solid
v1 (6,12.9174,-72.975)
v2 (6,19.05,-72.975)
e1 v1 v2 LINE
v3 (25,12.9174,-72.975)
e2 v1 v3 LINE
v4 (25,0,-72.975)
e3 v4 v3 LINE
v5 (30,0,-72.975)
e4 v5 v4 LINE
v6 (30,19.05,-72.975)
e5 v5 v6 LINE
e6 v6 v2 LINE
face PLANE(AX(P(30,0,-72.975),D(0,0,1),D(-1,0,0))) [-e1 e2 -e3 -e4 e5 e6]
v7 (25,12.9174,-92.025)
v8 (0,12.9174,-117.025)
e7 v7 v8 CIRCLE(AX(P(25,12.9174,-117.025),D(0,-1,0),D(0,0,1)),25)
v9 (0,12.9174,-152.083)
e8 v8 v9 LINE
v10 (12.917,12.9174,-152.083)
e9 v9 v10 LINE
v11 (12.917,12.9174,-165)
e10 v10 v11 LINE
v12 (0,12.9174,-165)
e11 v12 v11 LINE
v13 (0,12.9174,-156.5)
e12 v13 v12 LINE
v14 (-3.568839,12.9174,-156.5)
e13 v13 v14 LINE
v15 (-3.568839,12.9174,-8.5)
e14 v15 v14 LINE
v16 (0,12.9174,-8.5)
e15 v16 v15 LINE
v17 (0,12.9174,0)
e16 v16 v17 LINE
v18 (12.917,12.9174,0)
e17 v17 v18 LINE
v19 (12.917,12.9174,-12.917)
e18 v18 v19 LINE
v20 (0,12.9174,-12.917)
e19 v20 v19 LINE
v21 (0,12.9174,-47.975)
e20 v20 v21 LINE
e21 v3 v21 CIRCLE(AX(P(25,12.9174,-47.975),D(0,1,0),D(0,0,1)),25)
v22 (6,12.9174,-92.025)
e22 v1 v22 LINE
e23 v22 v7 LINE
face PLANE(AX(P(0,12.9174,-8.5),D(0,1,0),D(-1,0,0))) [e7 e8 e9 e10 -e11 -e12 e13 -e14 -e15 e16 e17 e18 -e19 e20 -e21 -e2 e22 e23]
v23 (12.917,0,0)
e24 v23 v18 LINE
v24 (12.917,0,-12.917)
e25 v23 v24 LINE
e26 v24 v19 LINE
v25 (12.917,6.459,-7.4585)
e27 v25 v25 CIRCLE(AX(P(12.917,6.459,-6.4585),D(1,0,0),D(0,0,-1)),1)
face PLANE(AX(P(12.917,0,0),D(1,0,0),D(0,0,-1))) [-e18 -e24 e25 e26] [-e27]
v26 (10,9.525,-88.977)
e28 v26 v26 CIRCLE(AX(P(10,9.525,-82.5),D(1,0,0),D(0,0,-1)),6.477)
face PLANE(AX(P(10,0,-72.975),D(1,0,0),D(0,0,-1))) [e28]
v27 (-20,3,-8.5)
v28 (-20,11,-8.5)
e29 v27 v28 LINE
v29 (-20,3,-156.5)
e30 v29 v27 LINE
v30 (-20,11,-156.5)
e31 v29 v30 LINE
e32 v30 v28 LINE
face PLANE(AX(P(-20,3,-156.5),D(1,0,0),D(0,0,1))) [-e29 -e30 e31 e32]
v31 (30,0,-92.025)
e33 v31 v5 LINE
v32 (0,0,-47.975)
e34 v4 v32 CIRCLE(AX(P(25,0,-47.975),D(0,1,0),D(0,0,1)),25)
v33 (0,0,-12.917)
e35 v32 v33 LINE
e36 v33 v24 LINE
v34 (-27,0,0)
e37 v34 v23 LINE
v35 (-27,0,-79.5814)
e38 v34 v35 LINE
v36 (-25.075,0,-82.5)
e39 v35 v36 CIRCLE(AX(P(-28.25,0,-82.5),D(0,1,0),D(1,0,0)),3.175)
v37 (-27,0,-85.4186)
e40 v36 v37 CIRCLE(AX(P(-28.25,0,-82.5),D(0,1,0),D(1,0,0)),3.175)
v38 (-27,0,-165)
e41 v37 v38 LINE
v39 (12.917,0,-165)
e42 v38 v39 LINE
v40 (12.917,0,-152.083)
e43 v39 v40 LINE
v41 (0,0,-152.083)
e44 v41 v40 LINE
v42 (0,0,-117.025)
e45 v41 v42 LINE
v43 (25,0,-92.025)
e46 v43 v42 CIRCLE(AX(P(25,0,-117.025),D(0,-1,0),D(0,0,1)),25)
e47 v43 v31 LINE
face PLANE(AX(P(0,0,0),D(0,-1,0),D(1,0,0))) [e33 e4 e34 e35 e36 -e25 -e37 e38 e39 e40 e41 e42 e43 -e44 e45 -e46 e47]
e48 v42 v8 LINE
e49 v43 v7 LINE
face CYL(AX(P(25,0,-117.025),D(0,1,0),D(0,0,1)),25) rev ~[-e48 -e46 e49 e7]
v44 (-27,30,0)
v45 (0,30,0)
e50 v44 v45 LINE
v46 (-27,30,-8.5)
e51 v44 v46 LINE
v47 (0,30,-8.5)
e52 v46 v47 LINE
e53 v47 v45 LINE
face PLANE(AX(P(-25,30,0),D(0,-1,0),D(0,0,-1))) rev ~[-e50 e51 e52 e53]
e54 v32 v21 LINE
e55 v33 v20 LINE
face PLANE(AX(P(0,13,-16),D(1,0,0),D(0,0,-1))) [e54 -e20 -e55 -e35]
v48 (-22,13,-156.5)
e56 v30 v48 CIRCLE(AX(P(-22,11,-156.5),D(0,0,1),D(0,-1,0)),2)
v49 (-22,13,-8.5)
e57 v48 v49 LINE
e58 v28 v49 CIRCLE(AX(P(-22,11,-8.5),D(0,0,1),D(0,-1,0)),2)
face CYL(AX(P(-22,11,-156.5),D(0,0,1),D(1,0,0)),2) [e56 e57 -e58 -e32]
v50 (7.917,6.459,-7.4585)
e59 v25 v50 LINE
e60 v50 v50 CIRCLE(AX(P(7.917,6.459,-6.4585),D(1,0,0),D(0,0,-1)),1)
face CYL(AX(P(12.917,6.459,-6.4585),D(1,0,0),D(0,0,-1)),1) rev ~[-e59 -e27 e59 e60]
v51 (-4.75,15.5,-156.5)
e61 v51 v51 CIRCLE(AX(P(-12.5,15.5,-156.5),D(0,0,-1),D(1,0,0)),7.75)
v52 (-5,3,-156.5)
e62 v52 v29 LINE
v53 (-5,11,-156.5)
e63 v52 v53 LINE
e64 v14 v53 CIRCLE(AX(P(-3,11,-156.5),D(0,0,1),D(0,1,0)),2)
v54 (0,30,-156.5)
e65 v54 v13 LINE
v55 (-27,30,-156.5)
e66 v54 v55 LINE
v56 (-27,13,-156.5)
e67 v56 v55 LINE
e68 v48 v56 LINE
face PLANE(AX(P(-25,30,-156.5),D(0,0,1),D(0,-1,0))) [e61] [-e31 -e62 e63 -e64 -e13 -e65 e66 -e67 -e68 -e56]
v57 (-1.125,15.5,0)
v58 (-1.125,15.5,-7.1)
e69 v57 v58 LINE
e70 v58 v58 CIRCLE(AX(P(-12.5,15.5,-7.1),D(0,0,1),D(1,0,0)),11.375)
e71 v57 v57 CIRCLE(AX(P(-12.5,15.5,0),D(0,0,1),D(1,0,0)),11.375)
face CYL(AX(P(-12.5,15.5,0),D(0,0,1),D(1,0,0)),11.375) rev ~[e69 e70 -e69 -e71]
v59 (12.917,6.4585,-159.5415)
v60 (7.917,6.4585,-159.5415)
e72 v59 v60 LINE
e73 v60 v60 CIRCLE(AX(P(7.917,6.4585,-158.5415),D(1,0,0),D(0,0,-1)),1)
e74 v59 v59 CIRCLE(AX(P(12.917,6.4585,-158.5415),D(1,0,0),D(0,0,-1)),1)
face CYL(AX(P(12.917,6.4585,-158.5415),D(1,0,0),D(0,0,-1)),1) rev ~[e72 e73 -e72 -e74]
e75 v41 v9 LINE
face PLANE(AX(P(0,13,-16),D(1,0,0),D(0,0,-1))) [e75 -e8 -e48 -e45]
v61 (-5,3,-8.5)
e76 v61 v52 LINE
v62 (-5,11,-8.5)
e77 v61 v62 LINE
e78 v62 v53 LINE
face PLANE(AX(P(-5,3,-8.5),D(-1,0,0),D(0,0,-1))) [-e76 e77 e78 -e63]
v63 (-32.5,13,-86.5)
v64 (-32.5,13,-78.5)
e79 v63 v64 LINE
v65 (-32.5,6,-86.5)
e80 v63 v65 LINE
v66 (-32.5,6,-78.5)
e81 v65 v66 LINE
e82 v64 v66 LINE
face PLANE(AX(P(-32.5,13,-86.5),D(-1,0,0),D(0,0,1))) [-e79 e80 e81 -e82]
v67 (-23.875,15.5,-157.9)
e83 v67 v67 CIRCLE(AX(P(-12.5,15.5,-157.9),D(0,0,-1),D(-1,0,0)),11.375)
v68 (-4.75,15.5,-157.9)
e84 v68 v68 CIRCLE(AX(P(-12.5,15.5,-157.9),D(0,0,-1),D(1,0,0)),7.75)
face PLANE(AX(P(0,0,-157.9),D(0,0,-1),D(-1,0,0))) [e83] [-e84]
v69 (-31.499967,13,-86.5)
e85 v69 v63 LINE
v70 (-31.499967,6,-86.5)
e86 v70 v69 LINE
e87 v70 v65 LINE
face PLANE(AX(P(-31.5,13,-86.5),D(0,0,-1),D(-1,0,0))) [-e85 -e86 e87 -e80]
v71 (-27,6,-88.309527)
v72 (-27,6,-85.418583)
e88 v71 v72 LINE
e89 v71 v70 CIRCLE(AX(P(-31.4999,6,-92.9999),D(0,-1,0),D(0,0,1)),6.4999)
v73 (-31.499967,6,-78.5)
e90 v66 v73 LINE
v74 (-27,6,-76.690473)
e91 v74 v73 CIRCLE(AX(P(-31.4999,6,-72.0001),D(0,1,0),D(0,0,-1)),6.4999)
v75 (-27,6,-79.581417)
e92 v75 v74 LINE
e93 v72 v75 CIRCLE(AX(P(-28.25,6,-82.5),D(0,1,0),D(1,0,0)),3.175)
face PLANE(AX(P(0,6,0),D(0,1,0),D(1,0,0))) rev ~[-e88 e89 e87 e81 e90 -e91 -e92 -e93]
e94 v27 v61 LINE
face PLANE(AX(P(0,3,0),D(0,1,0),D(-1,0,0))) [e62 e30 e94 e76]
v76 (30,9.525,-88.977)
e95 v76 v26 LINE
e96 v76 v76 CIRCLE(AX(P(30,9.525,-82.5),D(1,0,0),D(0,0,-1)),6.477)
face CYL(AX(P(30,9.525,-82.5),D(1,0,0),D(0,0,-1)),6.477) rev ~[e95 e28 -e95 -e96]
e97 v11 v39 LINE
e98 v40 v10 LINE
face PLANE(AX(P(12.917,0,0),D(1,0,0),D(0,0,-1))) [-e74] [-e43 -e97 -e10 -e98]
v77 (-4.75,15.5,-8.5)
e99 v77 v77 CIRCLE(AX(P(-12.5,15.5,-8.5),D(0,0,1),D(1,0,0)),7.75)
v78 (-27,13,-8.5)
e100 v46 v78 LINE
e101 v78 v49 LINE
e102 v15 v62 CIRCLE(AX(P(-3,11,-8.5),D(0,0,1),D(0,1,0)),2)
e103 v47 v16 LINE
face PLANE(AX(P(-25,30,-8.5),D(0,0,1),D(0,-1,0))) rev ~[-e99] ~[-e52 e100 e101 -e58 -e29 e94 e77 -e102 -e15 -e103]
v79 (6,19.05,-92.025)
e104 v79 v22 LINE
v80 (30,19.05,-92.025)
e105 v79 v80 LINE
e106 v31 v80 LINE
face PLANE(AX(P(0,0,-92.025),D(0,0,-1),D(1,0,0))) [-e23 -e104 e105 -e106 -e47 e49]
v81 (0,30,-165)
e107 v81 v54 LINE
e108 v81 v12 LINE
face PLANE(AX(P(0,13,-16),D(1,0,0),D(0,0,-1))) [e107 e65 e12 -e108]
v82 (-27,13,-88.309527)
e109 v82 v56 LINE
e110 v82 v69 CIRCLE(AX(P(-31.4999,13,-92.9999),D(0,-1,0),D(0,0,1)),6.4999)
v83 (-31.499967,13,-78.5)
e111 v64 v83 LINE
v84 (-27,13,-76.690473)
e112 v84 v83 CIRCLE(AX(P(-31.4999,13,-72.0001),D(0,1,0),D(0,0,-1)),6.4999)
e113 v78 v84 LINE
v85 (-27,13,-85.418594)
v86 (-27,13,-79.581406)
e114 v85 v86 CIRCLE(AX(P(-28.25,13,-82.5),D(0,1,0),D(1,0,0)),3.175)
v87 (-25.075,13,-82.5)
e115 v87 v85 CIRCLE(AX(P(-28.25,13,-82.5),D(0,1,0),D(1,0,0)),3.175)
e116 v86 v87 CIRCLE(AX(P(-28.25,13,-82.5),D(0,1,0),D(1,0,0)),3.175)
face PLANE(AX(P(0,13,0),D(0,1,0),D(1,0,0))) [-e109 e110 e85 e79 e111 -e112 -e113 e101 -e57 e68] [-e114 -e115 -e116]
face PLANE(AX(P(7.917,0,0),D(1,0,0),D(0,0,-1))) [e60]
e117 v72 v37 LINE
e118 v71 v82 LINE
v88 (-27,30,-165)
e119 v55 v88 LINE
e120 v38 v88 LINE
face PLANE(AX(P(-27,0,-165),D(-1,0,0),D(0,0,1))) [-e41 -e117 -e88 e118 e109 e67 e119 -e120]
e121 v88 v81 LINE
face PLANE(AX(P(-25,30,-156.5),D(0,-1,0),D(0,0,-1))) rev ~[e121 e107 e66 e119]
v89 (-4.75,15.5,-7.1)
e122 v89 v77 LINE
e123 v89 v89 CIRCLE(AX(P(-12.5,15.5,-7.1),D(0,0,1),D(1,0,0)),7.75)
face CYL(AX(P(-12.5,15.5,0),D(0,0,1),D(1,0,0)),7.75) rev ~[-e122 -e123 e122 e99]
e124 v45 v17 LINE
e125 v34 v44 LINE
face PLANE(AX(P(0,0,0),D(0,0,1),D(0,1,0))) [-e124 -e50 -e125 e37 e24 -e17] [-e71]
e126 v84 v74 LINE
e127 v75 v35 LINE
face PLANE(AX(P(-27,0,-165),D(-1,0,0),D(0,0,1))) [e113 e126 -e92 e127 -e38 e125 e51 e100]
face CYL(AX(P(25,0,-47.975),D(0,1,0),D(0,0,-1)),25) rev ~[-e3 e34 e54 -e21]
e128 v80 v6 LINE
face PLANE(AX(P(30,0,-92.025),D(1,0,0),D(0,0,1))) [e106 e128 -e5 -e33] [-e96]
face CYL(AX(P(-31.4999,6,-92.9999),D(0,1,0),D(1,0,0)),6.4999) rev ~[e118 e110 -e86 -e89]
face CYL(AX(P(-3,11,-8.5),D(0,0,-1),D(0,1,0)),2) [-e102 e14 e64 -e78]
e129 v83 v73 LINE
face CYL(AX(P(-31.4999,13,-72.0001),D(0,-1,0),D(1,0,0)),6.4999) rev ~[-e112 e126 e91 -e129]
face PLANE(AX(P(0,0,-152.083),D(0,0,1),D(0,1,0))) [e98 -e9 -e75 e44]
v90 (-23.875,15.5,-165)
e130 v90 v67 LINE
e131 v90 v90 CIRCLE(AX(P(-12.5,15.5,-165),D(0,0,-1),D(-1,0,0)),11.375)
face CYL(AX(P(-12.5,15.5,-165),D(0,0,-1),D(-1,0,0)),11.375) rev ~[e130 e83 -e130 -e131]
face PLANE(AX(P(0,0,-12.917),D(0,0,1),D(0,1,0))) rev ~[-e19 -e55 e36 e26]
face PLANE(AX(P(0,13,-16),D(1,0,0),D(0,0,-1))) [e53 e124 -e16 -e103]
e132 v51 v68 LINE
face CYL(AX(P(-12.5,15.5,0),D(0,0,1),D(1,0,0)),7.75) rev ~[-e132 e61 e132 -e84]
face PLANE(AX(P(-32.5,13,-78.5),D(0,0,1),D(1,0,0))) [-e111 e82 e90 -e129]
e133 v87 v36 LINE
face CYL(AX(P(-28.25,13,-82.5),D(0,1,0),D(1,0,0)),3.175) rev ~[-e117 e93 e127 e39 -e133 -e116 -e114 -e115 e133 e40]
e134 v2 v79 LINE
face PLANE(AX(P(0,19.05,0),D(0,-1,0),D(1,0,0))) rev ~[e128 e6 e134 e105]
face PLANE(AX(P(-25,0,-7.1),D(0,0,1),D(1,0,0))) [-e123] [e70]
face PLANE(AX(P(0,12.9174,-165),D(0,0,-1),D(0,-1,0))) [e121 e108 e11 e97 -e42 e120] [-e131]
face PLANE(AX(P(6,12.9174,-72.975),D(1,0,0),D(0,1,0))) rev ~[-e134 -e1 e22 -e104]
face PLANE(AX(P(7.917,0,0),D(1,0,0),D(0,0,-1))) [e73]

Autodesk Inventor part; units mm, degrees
ref_plane "YZ Plane" through (0, 0, 0) normal (1, 0, 0) x (0, 1, 0)
ref_plane "XZ Plane" through (0, 0, 0) normal (0, 1, 0) x (-1, 0, 0)
ref_plane "XY Plane" through (0, 0, 0) normal (0, 0, 1) x (1, 0, 0)
sketch "Sketch1" plane through (0, 0, 0) normal (0, 1, 0) x (-1, 0, 0)
  line L0 (0, 0) -> (25, 0)
  line L1 (25, 0) -> (25, -165)
  line L2 (25, -165) -> (0, -165)
  line L3 (0, -165) -> (0, 0)
  dimension "d0" = 25
  dimension "d1" = 165
extrude "Extrusion1" add sketch "Sketch1" along normal blind 3
sketch "Sketch2" plane through (0, 3, 0) normal (0, 1, 0) x (1, 0, 0)
  line L0 (0, 0) -> (0, 165) projected
  line L1 (-25, 165) -> (-25, 0) projected
  line L2 (0, 0) -> (-25, 0)
  line L3 (-25, 0) -> (-25, 8.5)
  line L4 (-25, 8.5) -> (0, 8.5)
  line L5 (0, 8.5) -> (0, 0)
  line L6 (-25, 165) -> (0, 165)
  line L7 (0, 165) -> (0, 156.5)
  line L8 (0, 156.5) -> (-25, 156.5)
  line L9 (-25, 156.5) -> (-25, 165)
  dimension "d4" = 8.5
  dimension "d5" = 8.5
extrude "Extrusion2" add sketch "Sketch2" along normal blind 25 contours L2 L1 L4 L0 | L8 L1 L6 L0
sketch "Sketch3" plane through (-25, 0, 0) normal (0, 0, 1) x (1, 0, 0)
  line L0 (0, 3) -> (0, 28) construction
  line L1 (25, 3) -> (25, 28) construction
  line L2 (0, 28) -> (25, 28) construction
  line L3 (25, 28) -> (25, 3) construction
  line L4 (25, 3) -> (0, 3) construction
  line L5 (0, 3) -> (0, 28) construction
  circle A0 centre (12.5, 15.5) radius 11.375
  point P0 (25, 0)
  dimension "d8" = 25
  dimension "d9" = 22.75
extrude "Extrusion3" cut sketch "Sketch3" against normal blind 7.1
sketch "Sketch4" plane through (-25, 0, 0) normal (0, 0, 1) x (1, 0, 0)
  circle A0 centre (12.5, 15.5) radius 11.375 projected
  circle A1 centre (12.5, 15.5) radius 7.75
  point P0 (25, 0)
  dimension "d12" = 15.5
extrude "Extrusion4" cut sketch "Sketch4" against normal blind 165 contours A1
sketch "Sketch5" plane through (0, 0, -165) normal (0, 0, -1) x (-1, 0, 0)
  circle A0 centre (12.5, 15.5) radius 7.75 projected
  circle A1 centre (12.5, 15.5) radius 11
  point P0 (0, 0)
extrude "Extrusion5" cut sketch "Sketch5" against normal blind 7.1
sketch "Sketch6" plane through (0, 3, 0) normal (0, 1, 0) x (1, 0, 0)
  line L0 (-25, 156.5) -> (-25, 8.5) projected
  line L1 (-20.25, 8.5) -> (-4.75, 8.5) projected
  line L2 (-25, 156.5) -> (-20, 156.5)
  line L3 (-20, 156.5) -> (-20, 8.5)
  line L4 (-20, 8.5) -> (-25, 8.5)
  line L5 (-25, 8.5) -> (-25, 156.5)
  line L6 (0, 8.5) -> (0, 156.5) projected
  line L7 (-4.75, 156.5) -> (-20.25, 156.5) projected
  line L8 (0, 8.5) -> (-5, 8.5)
  line L9 (-5, 8.5) -> (-5, 156.5)
  line L10 (-5, 156.5) -> (0, 156.5)
  line L11 (0, 156.5) -> (0, 8.5)
  point P0 (0, 0)
  dimension "d17" = 5
  dimension "d18" = 5
extrude "Extrusion6" add sketch "Sketch6" along normal blind 10 contours L2 L3 L1 L4 L0 | L7 L10 L6 L8 L1 L9
fillet "Fillet1" radius 2 2 edges at (-5, 13, -82.5) (-20, 13, -82.5)
sketch "Sketch7" plane through (0, 0, 0) normal (1, 0, 0) x (0, 0, -1)
  line L0 (165, 0) -> (0, 0) projected
  line L1 (0, 0) -> (16, 0)
  line L2 (16, 0) -> (16, 8)
  line L3 (16, 8) -> (0, 8)
  line L4 (0, 8) -> (0, 0)
  line L5 (165, 0) -> (149, 0)
  line L6 (149, 0) -> (149, 8)
  line L7 (149, 8) -> (165, 8)
  line L8 (165, 8) -> (165, 0)
  line L9 (0, 28) -> (8.5, 28) projected
  line L10 (0, 28) -> (16, 28)
  line L11 (16, 28) -> (16, 20)
  line L12 (16, 20) -> (0, 20)
  line L13 (0, 20) -> (0, 28)
  line L14 (165, 0) -> (165, 28) projected
  line L15 (165, 28) -> (149, 28)
  line L16 (149, 28) -> (149, 20)
  line L17 (149, 20) -> (165, 20)
  line L18 (165, 20) -> (165, 28)
  dimension "d22" = 16
  dimension "d23" = 8
  dimension "d24" = 16
  dimension "d25" = 16
  dimension "d26" = 8
extrude "Extrusion7" add sketch "Sketch7" along normal blind 45
fillet "Fillet2" radius 6 2 edges at (0, 24, -156.5) (0, 24, -8.5)
sketch "Sketch8" plane through (45, 0, 0) normal (1, 0, 0) x (0, 0, -1)
  line L0 (8.5, 20) -> (0, 20) construction
  line L1 (16, 28) -> (16, 20) construction
  line L2 (0, 20) -> (16, 28) construction
  line L3 (0, 0) -> (165, 0) construction
  line L4 (16, 8) -> (16, 0) construction
  line L5 (0, 0) -> (16, 8) construction
  line L6 (150.5, 28) -> (149, 28) construction
  line L7 (165, 8) -> (165, 20) construction
  line L8 (149, 28) -> (165, 20) construction
  line L9 (149, 0) -> (149, 8) construction
  line L10 (149, 8) -> (165, 0) construction
  line L11 (163.125, 22.25) -> (150.875, 22.25)
  line L12 (150.875, 22.25) -> (150.875, 25.75)
  line L13 (150.875, 25.75) -> (163.125, 25.75)
  line L14 (163.125, 25.75) -> (163.125, 22.25)
  line L15 (163.125, 22.25) -> (150.875, 25.75) construction
  line L16 (150.875, 22.25) -> (163.125, 25.75) construction
  line L17 (163.125, 2.25) -> (150.875, 2.25)
  line L18 (150.875, 2.25) -> (150.875, 5.75)
  line L19 (150.875, 5.75) -> (163.125, 5.75)
  line L20 (163.125, 5.75) -> (163.125, 2.25)
  line L21 (163.125, 2.25) -> (150.875, 5.75) construction
  line L22 (150.875, 2.25) -> (163.125, 5.75) construction
  line L23 (14.125, 22.25) -> (1.875, 22.25)
  line L24 (1.875, 22.25) -> (1.875, 25.75)
  line L25 (1.875, 25.75) -> (14.125, 25.75)
  line L26 (14.125, 25.75) -> (14.125, 22.25)
  line L27 (14.125, 22.25) -> (1.875, 25.75) construction
  line L28 (1.875, 22.25) -> (14.125, 25.75) construction
  line L29 (14.125, 2.25) -> (1.875, 2.25)
  line L30 (1.875, 2.25) -> (1.875, 5.75)
  line L31 (1.875, 5.75) -> (14.125, 5.75)
  line L32 (14.125, 5.75) -> (14.125, 2.25)
  line L33 (14.125, 2.25) -> (1.875, 5.75) construction
  line L34 (1.875, 2.25) -> (14.125, 5.75) construction
  point P0 (157, 24)
  point P1 (157, 4)
  point P2 (8, 24)
  point P3 (8, 4)
  dimension "d30" = 12.25
  dimension "d31" = 3.5
  dimension "d32" = 12.25
  dimension "d33" = 3.5
  dimension "d34" = 12.25
  dimension "d35" = 12.25
  dimension "d36" = 3.5
extrude "Extrusion8" cut sketch "Sketch8" against normal blind 40
sketch "Sketch9" plane through (0, 8, 0) normal (0, 1, 0) x (1, 0, 0)
  line L0 (0, 0) -> (0, 16) construction
  line L1 (0, 8) -> (0, 9) construction
  line L2 (45, 1.875) -> (45, 14.125) construction
  line L3 (0, 9) -> (45, 9) construction
  line L4 (45, 9) -> (45, 7) construction
  line L5 (45, 7) -> (0, 7) construction
  line L6 (0, 7) -> (0, 9) construction
  line L7 (0, 9) -> (45, 9)
  line L8 (45, 9) -> (45, 7)
  line L9 (45, 7) -> (0, 7)
  line L10 (0, 7) -> (0, 9)
  line L11 (0, 149) -> (0, 165) construction
  line L12 (0, 149) -> (0, 157) construction
  line L13 (0, 157) -> (0, 158) construction
  line L14 (45, 165) -> (45, 149) projected
  line L15 (0, 158) -> (45, 158)
  line L16 (45, 158) -> (45, 156)
  line L17 (45, 156) -> (0, 156)
  line L18 (0, 156) -> (0, 158)
  dimension "d39" = 1
  dimension "d40" = 2
  dimension "d41" = 8
  dimension "d42" = 1
  dimension "d43" = 2
extrude "Extrusion9" add sketch "Sketch9" along normal blind 12
fillet "Fillet3" radius 6 2 edges at (0, 16.5, -156.5) (0, 16.5, -8.5)
sketch "Sketch10" plane through (-25, 0, -165) normal (-1, 0, 0) x (0, 0, 1)
  line L0 (165, 0) -> (0, 0) construction
  line L1 (82.5, 0) -> (82.5, 6) construction
  line L2 (156.5, 13) -> (8.5, 13) construction
  line L3 (82.5, 6) -> (86.5, 6) construction
  line L4 (86.5, 6) -> (86.5, 13) construction
  line L5 (86.5, 13) -> (82.5, 13) construction
  line L6 (82.5, 13) -> (82.5, 6) construction
  line L7 (86.5, 6) -> (78.5, 6)
  line L8 (78.5, 6) -> (78.5, 13)
  line L9 (78.5, 13) -> (86.5, 13)
  line L10 (86.5, 13) -> (86.5, 6)
  dimension "d47" = 6
  dimension "d48" = 4
  dimension "d49" = 8
extrude "Extrusion10" add sketch "Sketch10" along normal blind 6.5
sketch "Sketch11" plane through (0, 13, 0) normal (0, 1, 0) x (1, 0, 0)
  line L0 (-25, 156.5) -> (-25, 86.5) construction
  line L1 (-31.5, 78.5) -> (-31.5, 86.5) construction
  line L2 (-25, 86.5) -> (-31.5, 78.5) construction
  circle A0 centre (-28.25, 82.5) radius 3.175
  point P0 (0, 0)
  dimension "d52" = 6.35
extrude "Extrusion11" cut sketch "Sketch11" against normal blind 8
fillet "Fillet4" radius 6.5 2 edges at (-25, 9.5, -86.5) (-25, 9.5, -78.5)
sketch "Sketch12" plane through (-25, 0, 0) normal (0, 0, 1) x (1, 0, 0)
  circle A0 centre (12.5, 15.5) radius 7.75 construction
  circle A1 centre (12.5, 15.5) radius 23.5 construction
  line L0 (25, 20) -> (70, 20) projected
  arc A2 (70, 20) -> (25, 0) centre (68.4414, -37.118) ccw
  line L1 (70, 8) -> (70, 0) projected
  line L2 (25, 0) -> (70, 0)
  line L3 (70, 0) -> (70, 20)
  dimension "d56" = 47
sketch "Sketch13" plane through (0, 13, 0) normal (0, 1, 0) x (1, 0, 0)
  line L0 (-31.5, 86.5) -> (-31.5, 78.5) projected
  line L1 (-31.5, 86.5) -> (-32.5, 86.5)
  line L2 (-32.5, 86.5) -> (-32.5, 78.5)
  line L3 (-32.5, 78.5) -> (-31.5, 78.5)
  line L4 (-31.5, 78.5) -> (-31.5, 86.5)
  point P0 (0, 0)
  dimension "d57" = 1
extrude "Extrusion12" add sketch "Sketch13" against normal blind 7
sketch "Sketch14" plane through (-25, 0, -165) normal (0, 0, -1) x (-1, 0, 0)
  circle A0 centre (-12.5, 15.5) radius 11.375 projected
  circle A1 centre (-12.5, 15.5) radius 11.375
  point P0 (-25, 0)
extrude "Extrusion13" cut sketch "Sketch14" against normal blind 7.1
sketch "Sketch15" plane through (0, 8, 0) normal (0, 1, 0) x (1, 0, 0)
  line L0 (0, 16) -> (45, 16) projected
  line L1 (0, 0) -> (45, 0)
  line L2 (45, 0) -> (45, 16)
  line L3 (45, 16) -> (0, 16)
  line L4 (0, 16) -> (0, 0)
  line L5 (0, 149) -> (45, 149) projected
  line L6 (0, 149) -> (45, 149)
  line L7 (45, 149) -> (45, 165)
  line L8 (45, 165) -> (0, 165)
  line L9 (0, 165) -> (0, 149)
extrude "Extrusion14" add sketch "Sketch15" along normal blind 14.5
sketch "Sketch16" plane through (-25, 0, 0) normal (0, 0, 1) x (1, 0, 0)
  point P0 (25, 0)
sketch "Sketch17" plane through (0, 28, 0) normal (0, 1, 0) x (1, 0, 0)
  line L0 (-25, 0) -> (0, 0)
  line L1 (0, 0) -> (0, 8.5)
  line L2 (0, 8.5) -> (-25, 8.5)
  line L3 (-25, 8.5) -> (-25, 0)
  line L4 (0, 16) -> (45, 16) projected
  line L5 (0, 0) -> (45, 0)
  line L6 (45, 0) -> (45, 16)
  line L7 (45, 16) -> (0, 16)
  line L8 (0, 16) -> (0, 0)
  line L9 (0, 150.5) -> (0, 149) projected
  line L10 (-25, 165) -> (45, 165) projected
  line L11 (0, 149) -> (45, 149)
  line L12 (45, 149) -> (45, 165)
  line L13 (45, 165) -> (0, 165)
  line L14 (0, 165) -> (0, 149)
  line L15 (-25, 156.5) -> (-25, 93) projected
  line L16 (-25, 156.5) -> (0, 156.5)
  line L17 (0, 156.5) -> (0, 165)
  line L18 (0, 165) -> (-25, 165)
  line L19 (-25, 165) -> (-25, 156.5)
  arc A0 (0, 150.5) -> (-6, 156.5) centre (-6, 150.5) ccw projected
  arc A1 (0, 150.5) -> (-6, 156.5) centre (-6, 150.5) ccw
  arc A2 (-6, 8.5) -> (0, 14.5) centre (-6, 14.5) ccw projected
  arc A3 (-6, 8.5) -> (0, 14.5) centre (-6, 14.5) ccw
extrude "Extrusion15" add sketch "Sketch17" along normal blind 2
sketch "Sketch18" plane through (-25, 0, -165) normal (-1, 0, 0) x (0, 0, 1)
  line L0 (165, 0) -> (165, 30) projected
  line L1 (165, 0) -> (0, 0) projected
  line L2 (165, 30) -> (156.5, 30)
  line L3 (156.5, 30) -> (156.5, 0)
  line L4 (156.5, 0) -> (165, 0)
  line L5 (165, 0) -> (165, 30)
  line L6 (8.5, 30) -> (8.5, 20) projected
  line L7 (0, 0) -> (0, 30) projected
  line L8 (8.5, 30) -> (0, 30)
  line L9 (0, 30) -> (0, 0)
  line L10 (0, 0) -> (8.5, 0)
  line L11 (8.5, 0) -> (8.5, 30)
  line L12 (93, 13) -> (156.5, 13) projected
  line L13 (8.5, 0) -> (156.5, 0)
  line L14 (156.5, 0) -> (156.5, 13)
  line L15 (156.5, 13) -> (8.5, 13)
  line L16 (8.5, 13) -> (8.5, 0)
  dimension "d66" = 8.5
extrude "Extrusion16" add sketch "Sketch18" along normal blind 2
sketch "Sketch19" plane through (0, 13, 0) normal (0, 1, 0) x (1, 0, 0)
  arc A0 (-27, 85.4186) -> (-27, 79.5814) centre (-28.25, 82.5) ccw projected
  circle A1 centre (-28.25, 82.5) radius 3.175
  point P0 (0, 0)
extrude "Extrusion17" cut sketch "Sketch19" against normal blind 20
extrude "Extrusion18" cut sketch "Sketch12" against normal blind 165
sketch "Sketch20" plane through (0, 13, -16) normal (1, 0, 0) x (0, 0, -1)
  line L0 (-19.7473, 36.8678) -> (154.646, 36.8678)
  line L1 (154.646, 36.8678) -> (154.646, -33.1777)
  line L2 (154.646, -33.1777) -> (-19.7473, -33.1777)
  line L3 (-19.7473, -33.1777) -> (-19.7473, 36.8678)
  point P0 (-16, -13)
extrude "Extrusion19" cut sketch "Sketch20" along normal blind 47
sketch "Sketch21" plane through (-5, 3, -8.5) normal (0, 0, -1) x (-1, 0, 0)
  line L0 (1, 17) -> (1, 27) projected
  line L1 (1, 27) -> (-5, 27)
  line L2 (-5, 27) -> (-5, 9.9174)
  line L3 (-5, 9.9174) -> (1, 9.9174)
  line L4 (1, 9.9174) -> (1, 27)
  point P0 (-5, -3)
  dimension "d75" = 6
extrude "Extrusion20" cut sketch "Sketch21" along normal blind 148
sketch "Sketch22" plane through (0, 0, 0) normal (0, -1, 0) x (1, 0, 0)
  line L0 (-30, -92.025) -> (30, -92.025)
  line L1 (30, -92.025) -> (30, -72.975)
  line L2 (30, -72.975) -> (-30, -72.975)
  line L3 (-30, -72.975) -> (-30, -92.025)
  line L4 (0, -165) -> (0, 0) projected
  line L5 (-30, -92.025) -> (30, -72.975) construction
  line L6 (30, -92.025) -> (-30, -72.975) construction
  point P0 (0, -82.5)
  point P1 (0, -72.975)
  point P2 (0, -92.025)
  dimension "d78" = 60
  dimension "d79" = 19.05
extrude "Extrusion21" add sketch "Sketch22" against normal blind 19.05 contours L4 L2 L1 L0
fillet "Fillet5" radius 25 2 edges at (0, 6.4587, -72.975) (0, 6.4587, -92.025)
sketch "Sketch23" plane through (0, 19.05, -72.975) normal (0, 0, 1) x (1, 0, 0)
  line L0 (0, -6.1326) -> (25, -6.1326) projected
  line L1 (0, 0) -> (30, 0) projected
  line L2 (0, -6.1326) -> (6, -6.1326)
  line L3 (6, -6.1326) -> (6, 0)
  line L4 (6, 0) -> (0, 0)
  line L5 (0, 0) -> (0, -6.1326)
  point P0 (0, -19.05)
  dimension "d83" = 6
extrude "Extrusion22" cut sketch "Sketch23" against normal blind 26.8
sketch "Sketch24" plane through (30, 0, -72.975) normal (1, 0, 0) x (0, 0, -1)
  circle A0 centre (9.525, 9.525) radius 6.477
  point P0 (-72.975, 0)
  dimension "d86" = 12.954
extrude "Extrusion23" cut sketch "Sketch24" against normal blind 20
sketch "Sketch25" plane through (0, 0, 0) normal (1, 0, 0) x (0, 0, -1)
  line L0 (0, 0) -> (0, 30) projected
  line L1 (47.975, 12.9174) -> (8.5, 12.9174) projected
  line L2 (0, 0) -> (12.917, 0)
  line L3 (12.917, 0) -> (12.917, 12.9174)
  line L4 (12.917, 12.9174) -> (0, 12.9174)
  line L5 (0, 12.9174) -> (0, 0)
  line L6 (165, 0) -> (152.083, 0)
  line L7 (152.083, 0) -> (152.083, 12.9174)
  line L8 (152.083, 12.9174) -> (165, 12.9174)
  line L9 (165, 12.9174) -> (165, 0)
  dimension "d89" = 12.917
  dimension "d90" = 12.917
extrude "Extrusion24" add sketch "Sketch25" along normal blind 12.917
sketch "Sketch26" plane through (12.917, 0, 0) normal (1, 0, 0) x (0, 0, -1)
  circle A0 centre (6.4585, 6.459) radius 1
  circle A1 centre (158.5415, 6.4585) radius 1
  point P0 (0, 0)
  dimension "d93" = 2
  dimension "d94" = 2
extrude "Extrusion25" cut sketch "Sketch26" against normal blind 5
properties part number "frontAxelHolder 10-24_3DPrint"
